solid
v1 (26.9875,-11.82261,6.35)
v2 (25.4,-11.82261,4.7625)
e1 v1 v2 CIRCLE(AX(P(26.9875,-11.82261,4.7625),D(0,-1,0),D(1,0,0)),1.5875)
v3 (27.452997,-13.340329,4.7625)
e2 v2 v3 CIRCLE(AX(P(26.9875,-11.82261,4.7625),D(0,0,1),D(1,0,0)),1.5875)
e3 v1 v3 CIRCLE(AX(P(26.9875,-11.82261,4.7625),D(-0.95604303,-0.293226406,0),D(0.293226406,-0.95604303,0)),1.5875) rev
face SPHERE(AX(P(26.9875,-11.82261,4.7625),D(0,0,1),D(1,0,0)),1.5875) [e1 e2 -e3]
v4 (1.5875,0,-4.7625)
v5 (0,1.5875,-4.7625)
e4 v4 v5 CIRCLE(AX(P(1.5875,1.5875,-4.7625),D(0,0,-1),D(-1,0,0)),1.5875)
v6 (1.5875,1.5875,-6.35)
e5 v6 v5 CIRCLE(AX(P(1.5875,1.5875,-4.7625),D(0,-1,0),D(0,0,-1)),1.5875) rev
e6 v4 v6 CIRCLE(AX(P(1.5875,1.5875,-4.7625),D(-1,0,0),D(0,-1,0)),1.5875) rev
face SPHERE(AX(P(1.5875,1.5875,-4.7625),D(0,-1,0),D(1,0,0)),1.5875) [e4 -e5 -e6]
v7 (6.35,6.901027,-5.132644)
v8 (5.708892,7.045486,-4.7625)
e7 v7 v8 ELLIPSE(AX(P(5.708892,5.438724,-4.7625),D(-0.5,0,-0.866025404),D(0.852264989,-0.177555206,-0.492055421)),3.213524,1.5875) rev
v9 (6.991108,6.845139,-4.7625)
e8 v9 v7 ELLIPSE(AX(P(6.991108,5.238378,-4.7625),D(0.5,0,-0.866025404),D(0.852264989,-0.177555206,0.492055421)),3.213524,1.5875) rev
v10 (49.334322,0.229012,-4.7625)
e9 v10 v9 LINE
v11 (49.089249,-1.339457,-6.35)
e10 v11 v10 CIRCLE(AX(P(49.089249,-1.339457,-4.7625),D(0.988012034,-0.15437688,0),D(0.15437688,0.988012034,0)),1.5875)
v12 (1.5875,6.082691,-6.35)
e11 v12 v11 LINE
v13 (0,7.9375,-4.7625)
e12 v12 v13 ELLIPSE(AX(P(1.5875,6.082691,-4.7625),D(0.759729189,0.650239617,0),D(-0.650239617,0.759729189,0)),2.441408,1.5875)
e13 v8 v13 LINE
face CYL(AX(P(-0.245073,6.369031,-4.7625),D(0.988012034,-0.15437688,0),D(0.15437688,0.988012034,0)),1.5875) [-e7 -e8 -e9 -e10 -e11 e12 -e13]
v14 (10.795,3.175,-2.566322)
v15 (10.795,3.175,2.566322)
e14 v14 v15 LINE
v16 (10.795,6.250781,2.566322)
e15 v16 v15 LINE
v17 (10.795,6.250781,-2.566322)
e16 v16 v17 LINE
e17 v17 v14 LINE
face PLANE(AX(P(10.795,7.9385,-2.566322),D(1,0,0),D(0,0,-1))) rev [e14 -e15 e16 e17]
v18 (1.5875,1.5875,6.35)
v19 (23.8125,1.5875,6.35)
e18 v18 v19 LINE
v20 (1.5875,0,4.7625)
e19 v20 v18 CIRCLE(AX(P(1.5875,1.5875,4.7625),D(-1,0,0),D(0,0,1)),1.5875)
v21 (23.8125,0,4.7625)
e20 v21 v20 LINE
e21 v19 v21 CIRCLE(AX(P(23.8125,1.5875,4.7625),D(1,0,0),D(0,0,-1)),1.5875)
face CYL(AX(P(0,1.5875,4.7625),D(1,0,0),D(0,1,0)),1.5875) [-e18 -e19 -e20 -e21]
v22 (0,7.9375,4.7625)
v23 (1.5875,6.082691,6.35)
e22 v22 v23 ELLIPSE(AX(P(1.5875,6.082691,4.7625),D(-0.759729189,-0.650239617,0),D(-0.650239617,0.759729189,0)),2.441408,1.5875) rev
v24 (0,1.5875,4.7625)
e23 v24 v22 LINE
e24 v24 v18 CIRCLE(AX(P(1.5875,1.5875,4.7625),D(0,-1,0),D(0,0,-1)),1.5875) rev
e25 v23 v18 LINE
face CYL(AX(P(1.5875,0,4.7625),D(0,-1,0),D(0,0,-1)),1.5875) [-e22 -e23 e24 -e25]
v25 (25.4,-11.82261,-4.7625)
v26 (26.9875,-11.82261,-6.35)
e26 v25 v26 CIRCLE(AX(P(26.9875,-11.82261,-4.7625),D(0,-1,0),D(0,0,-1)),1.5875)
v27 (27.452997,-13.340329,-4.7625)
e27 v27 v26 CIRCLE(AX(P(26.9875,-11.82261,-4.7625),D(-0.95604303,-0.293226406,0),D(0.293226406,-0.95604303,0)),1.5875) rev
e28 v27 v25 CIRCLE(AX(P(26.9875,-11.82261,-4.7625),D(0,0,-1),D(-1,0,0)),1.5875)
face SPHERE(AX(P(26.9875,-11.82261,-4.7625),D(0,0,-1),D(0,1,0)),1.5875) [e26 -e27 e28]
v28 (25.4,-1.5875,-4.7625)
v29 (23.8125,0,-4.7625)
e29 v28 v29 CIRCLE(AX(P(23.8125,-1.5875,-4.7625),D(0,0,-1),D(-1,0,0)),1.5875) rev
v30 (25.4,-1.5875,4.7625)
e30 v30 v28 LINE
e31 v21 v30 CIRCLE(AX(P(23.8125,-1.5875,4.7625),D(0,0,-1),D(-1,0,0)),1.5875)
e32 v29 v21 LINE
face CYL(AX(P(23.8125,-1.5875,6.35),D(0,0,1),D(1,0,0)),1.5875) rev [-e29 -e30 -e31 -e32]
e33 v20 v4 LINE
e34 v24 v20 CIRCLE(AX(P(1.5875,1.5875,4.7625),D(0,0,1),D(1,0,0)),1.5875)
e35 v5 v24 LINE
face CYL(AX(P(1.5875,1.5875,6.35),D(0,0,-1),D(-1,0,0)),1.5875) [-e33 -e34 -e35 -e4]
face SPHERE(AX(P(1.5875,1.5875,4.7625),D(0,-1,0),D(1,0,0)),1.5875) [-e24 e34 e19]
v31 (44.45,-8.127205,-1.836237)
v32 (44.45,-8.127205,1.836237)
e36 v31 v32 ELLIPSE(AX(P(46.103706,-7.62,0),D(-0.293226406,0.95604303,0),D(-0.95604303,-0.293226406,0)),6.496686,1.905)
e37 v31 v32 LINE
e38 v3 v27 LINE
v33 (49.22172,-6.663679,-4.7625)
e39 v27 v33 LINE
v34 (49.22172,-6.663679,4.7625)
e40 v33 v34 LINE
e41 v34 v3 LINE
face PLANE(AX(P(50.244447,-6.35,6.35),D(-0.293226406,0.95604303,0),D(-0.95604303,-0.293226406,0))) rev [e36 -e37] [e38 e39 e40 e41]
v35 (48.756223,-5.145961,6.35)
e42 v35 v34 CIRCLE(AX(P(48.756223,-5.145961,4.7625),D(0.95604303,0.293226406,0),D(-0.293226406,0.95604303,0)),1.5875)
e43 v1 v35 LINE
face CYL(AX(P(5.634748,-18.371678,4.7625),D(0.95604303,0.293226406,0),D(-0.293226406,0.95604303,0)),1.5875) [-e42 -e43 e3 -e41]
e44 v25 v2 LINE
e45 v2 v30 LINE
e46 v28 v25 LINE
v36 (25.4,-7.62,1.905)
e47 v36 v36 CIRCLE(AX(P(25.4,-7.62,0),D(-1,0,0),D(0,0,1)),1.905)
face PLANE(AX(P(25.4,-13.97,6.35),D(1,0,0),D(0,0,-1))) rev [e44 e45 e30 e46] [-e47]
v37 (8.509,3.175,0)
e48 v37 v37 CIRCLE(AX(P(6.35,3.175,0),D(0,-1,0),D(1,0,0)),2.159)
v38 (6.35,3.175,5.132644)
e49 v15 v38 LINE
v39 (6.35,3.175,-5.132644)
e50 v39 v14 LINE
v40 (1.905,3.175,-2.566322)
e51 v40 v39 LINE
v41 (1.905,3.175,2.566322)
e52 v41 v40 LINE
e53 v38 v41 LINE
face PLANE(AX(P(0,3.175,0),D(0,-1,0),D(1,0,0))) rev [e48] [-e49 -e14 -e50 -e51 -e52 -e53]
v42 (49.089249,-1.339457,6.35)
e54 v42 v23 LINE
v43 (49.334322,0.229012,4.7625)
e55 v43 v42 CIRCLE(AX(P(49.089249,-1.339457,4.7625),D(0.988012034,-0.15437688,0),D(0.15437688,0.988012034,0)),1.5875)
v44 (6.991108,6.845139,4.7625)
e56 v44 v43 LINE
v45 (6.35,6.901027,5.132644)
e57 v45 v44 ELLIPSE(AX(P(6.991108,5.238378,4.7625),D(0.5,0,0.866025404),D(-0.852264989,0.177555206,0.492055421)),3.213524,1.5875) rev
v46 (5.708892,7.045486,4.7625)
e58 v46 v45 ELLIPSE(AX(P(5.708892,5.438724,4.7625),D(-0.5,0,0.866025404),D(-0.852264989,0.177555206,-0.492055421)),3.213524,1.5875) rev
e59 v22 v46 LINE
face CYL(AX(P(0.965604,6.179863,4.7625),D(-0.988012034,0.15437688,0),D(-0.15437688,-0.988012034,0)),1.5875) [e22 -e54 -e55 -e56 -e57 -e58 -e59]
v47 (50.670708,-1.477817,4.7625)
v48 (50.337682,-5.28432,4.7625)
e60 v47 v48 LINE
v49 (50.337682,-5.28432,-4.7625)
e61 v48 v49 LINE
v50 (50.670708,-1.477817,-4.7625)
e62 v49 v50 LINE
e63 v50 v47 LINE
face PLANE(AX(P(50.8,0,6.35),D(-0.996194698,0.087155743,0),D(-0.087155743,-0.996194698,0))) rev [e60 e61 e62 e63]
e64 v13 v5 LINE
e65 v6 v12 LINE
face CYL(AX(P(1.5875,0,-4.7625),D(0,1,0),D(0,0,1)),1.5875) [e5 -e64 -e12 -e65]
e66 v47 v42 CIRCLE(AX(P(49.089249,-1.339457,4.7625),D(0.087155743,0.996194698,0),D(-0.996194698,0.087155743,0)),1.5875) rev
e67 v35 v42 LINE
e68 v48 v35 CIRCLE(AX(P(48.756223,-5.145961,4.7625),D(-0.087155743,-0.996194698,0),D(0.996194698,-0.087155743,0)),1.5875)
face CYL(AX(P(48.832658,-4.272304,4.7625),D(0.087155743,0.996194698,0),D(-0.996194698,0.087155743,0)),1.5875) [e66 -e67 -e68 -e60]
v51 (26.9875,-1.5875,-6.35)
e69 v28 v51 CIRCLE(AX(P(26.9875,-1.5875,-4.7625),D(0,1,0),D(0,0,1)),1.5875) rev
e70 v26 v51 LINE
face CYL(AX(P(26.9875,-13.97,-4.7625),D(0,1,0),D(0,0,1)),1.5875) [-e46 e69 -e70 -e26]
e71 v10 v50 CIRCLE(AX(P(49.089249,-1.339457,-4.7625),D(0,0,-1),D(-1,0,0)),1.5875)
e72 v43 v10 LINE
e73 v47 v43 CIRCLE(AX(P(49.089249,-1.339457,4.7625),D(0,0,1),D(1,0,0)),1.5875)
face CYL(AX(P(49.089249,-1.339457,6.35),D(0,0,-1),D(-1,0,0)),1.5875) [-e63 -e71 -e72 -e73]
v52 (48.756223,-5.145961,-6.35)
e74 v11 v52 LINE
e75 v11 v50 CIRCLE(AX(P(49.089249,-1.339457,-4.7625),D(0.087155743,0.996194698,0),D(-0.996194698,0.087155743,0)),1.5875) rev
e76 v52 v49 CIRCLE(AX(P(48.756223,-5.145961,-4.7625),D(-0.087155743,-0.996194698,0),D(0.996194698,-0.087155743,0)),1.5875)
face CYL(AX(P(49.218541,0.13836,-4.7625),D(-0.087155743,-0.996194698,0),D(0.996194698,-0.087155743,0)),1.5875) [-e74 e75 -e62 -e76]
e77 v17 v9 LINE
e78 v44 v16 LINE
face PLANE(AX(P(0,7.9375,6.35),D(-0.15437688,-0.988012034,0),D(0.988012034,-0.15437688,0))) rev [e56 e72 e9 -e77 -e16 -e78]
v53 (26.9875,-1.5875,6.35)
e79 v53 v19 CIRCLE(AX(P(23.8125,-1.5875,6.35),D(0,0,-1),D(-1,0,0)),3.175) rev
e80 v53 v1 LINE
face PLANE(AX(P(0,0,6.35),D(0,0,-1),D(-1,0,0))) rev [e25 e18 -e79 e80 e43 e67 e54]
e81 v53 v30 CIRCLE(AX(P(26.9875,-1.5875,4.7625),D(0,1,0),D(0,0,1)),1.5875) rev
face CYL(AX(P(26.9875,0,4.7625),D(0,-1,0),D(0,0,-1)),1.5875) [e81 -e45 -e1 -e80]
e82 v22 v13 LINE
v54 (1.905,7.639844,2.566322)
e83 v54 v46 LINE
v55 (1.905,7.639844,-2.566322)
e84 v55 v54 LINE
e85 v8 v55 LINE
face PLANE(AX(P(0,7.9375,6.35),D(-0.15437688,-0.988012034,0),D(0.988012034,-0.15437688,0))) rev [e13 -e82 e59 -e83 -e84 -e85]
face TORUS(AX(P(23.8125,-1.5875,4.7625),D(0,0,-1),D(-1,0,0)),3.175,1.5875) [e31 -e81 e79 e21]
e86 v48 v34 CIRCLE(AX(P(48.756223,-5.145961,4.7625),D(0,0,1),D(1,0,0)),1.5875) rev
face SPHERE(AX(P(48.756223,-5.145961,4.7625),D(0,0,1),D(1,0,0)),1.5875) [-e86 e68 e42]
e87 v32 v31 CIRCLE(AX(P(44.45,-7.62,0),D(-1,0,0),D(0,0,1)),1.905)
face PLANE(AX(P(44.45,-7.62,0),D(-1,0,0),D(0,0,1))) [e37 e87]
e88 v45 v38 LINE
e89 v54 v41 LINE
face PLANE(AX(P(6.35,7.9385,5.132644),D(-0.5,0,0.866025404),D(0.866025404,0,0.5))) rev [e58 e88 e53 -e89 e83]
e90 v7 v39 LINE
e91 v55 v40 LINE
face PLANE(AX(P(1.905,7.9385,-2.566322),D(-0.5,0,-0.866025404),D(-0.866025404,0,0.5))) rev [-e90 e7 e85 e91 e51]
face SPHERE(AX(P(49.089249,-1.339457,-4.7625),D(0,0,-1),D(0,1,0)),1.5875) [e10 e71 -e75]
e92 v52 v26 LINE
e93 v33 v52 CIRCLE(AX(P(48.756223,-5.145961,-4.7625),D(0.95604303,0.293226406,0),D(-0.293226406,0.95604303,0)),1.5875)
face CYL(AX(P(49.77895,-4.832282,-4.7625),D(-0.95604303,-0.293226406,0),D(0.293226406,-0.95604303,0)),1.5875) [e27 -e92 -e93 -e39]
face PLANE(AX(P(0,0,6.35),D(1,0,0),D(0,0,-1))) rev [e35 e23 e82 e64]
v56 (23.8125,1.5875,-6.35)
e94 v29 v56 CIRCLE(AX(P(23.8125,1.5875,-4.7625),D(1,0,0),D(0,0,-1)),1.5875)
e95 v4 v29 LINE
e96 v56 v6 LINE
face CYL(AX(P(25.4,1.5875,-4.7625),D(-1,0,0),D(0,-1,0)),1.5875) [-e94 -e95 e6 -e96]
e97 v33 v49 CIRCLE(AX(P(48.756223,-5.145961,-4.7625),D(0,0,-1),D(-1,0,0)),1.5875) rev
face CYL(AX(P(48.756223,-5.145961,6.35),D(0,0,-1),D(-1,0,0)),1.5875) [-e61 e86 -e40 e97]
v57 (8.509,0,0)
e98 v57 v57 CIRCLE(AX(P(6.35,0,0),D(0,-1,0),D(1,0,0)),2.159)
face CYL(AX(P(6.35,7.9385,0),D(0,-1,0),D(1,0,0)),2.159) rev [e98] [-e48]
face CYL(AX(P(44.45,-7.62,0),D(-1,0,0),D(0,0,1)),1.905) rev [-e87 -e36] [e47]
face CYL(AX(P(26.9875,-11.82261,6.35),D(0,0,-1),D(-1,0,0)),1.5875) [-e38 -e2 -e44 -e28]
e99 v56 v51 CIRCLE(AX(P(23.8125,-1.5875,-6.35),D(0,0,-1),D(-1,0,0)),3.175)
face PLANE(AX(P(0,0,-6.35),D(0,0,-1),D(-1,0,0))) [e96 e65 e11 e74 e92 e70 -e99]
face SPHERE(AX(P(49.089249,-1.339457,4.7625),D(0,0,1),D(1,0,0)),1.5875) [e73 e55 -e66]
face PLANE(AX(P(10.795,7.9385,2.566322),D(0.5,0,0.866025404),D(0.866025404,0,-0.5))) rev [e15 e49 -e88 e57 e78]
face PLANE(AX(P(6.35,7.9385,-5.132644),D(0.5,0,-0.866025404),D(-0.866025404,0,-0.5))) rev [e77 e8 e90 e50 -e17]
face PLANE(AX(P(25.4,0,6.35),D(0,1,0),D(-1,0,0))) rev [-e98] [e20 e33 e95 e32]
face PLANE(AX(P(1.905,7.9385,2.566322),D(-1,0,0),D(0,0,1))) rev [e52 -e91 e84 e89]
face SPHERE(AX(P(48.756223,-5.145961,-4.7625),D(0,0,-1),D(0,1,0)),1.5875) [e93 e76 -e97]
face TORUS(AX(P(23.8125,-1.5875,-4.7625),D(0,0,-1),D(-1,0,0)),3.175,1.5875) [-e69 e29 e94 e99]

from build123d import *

# Parameters (mm, degrees)
BOSS_EXTRUDE1_DEPTH = 6.35
CUT_EXTRUDE1_REACH  = 55.067
SKETCH2_R           = 2.159
CUT_EXTRUDE2_REACH  = 58.242
CUT_EXTRUDE2_START  = -3.175
SKETCH4_R           = 1.905
CUT_EXTRUDE3_DEPTH  = 19.05
FILLET1_R           = 1.5875


with BuildPart() as part:
    # Sketch1 → Boss-Extrude1 (new, symmetric)
    with BuildSketch(Plane.XY):
        Polygon((0, 0), (0, 7.9375), (25.4, 3.96875), (50.8, 0), (50.244446987, -6.35), (25.4, -13.97), (25.4, 0), align=None)
    extrude(amount=BOSS_EXTRUDE1_DEPTH, both=True)

    # Cut-Extrude1: up to this plane
    cut_extrude1_end = Plane(origin=(0, 7.9375, 6.35), z_dir=(-0.15437688027360963, -0.9880120337511015, 0))
    # Sketch2 → Cut-Extrude1 (cut, up to the surface)
    with BuildSketch(Plane(origin=(0, 0, 0), x_dir=(-1, 0, 0), z_dir=(0, -1, 0)), mode=Mode.PRIVATE) as cut_extrude1_sk1:
        with Locations(Location((-6.35, 0, 0), (0, 0, 180))):
            Circle(SKETCH2_R)
    cut_extrude1_tool1 = split(extrude(cut_extrude1_sk1.sketch, amount=-CUT_EXTRUDE1_REACH, mode=Mode.PRIVATE), bisect_by=cut_extrude1_end, keep=Keep.BOTH, mode=Mode.PRIVATE)
    add(cut_extrude1_tool1.solids().sort_by_distance((6.35, 0, 0))[0], mode=Mode.SUBTRACT)

    # Cut-Extrude2: up to this plane
    cut_extrude2_end = Plane(origin=(0, 7.9375, 6.35), z_dir=(-0.15437688027360963, -0.9880120337511015, 0))
    # Sketch3 → Cut-Extrude2 (cut, up to the surface)
    with BuildSketch(Plane.XZ.offset(CUT_EXTRUDE2_START), mode=Mode.PRIVATE) as cut_extrude2_sk1:
        Polygon((6.35, 5.132643893), (1.905, 2.566321947), (1.905, -2.566321947), (6.35, -5.132643893), (10.795, -2.566321947), (10.795, 2.566321947), align=None)
    cut_extrude2_tool1 = split(extrude(cut_extrude2_sk1.sketch, amount=-CUT_EXTRUDE2_REACH, mode=Mode.PRIVATE), bisect_by=cut_extrude2_end, keep=Keep.BOTH, mode=Mode.PRIVATE)
    add(cut_extrude2_tool1.solids().sort_by_distance((6.35, 3.175, 0))[0], mode=Mode.SUBTRACT)

    # Sketch4 → Cut-Extrude3 (cut)
    with BuildSketch(Plane.ZY.offset(-25.4)):
        with Locations((0, -7.62)):
            Circle(SKETCH4_R)
    extrude(amount=-CUT_EXTRUDE3_DEPTH, mode=Mode.SUBTRACT)

    # Fillet1
    # the kernel refuses this fillet: 1.5875 mm, written as the material it adds along each edge
    with BuildSketch(Plane(origin=(25.4, 0, -6.35), x_dir=(-1, 0, 0), z_dir=(0, 0, 1))) as fillet1_piece_1:
        with BuildLine():
            CenterArc((FILLET1_R, FILLET1_R), FILLET1_R, 180, 90)
            Line((0, FILLET1_R), (0, 0))
            Line((0, 0), (FILLET1_R, 0))
        make_face()
    extrude(amount=12.7)
    # the kernel refuses this fillet: 1.5875 mm, written as the material it takes off along each edge
    with BuildSketch(Plane(origin=(1.5875, 1.5875, -4.7625), x_dir=(0, -1, 0), z_dir=(-1, 0, 0))) as fillet1_2_piece_1_section:
        Polygon((0, 0), (FILLET1_R, 0), (FILLET1_R, -FILLET1_R), (0, -FILLET1_R), align=None)
    fillet1_2_piece_1 = extrude(amount=FILLET1_R, mode=Mode.PRIVATE)
    fillet1_2_piece_1 = fillet1_2_piece_1 - Plane(origin=(1.5875, 1.5875, -4.7625), x_dir=(0, 0.7071067811865475, 0.7071067811865475), z_dir=(-1, 0, 0)) * Sphere(FILLET1_R, mode=Mode.PRIVATE)
    add(fillet1_2_piece_1, mode=Mode.SUBTRACT)
    with BuildSketch(Plane(origin=(1.5875, 1.5875, 4.7625), x_dir=(0, -1, 0), z_dir=(-1, 0, 0))) as fillet1_2_piece_2_section:
        Polygon((0, 0), (FILLET1_R, 0), (FILLET1_R, FILLET1_R), (0, FILLET1_R), align=None)
    fillet1_2_piece_2 = extrude(amount=FILLET1_R, mode=Mode.PRIVATE)
    fillet1_2_piece_2 = fillet1_2_piece_2 - Plane(origin=(1.5875, 1.5875, 4.7625), x_dir=(0, 0.7071067811865475, -0.7071067811865475), z_dir=(-1, 0, 0)) * Sphere(FILLET1_R, mode=Mode.PRIVATE)
    add(fillet1_2_piece_2, mode=Mode.SUBTRACT)
    with BuildSketch(Plane(origin=(48.756222782, -5.145960715, 4.7625), x_dir=(0.9961946980917461, -0.08715574274765191, 0), z_dir=(0, 0, 1))) as fillet1_2_piece_3_section:
        Polygon((0, 0), (FILLET1_R, 0), (FILLET1_R, -FILLET1_R * 0.67385843517), (FILLET1_R * 0.375435230935, -FILLET1_R * 0.926848632395), align=None)
    fillet1_2_piece_3 = extrude(amount=FILLET1_R, mode=Mode.PRIVATE)
    fillet1_2_piece_3 = fillet1_2_piece_3 - Plane(origin=(48.756222782, -5.145960715, 4.7625), x_dir=(-0.7774271509889946, 0.6289729921905509, 0), z_dir=(0, 0, 1)) * Sphere(FILLET1_R, mode=Mode.PRIVATE)
    add(fillet1_2_piece_3, mode=Mode.SUBTRACT)
    with BuildSketch(Plane(origin=(26.9875, -11.822610338, 4.7625), x_dir=(0.2932264055627704, -0.9560430299315705, 0), z_dir=(0, 0, 1))) as fillet1_2_piece_4_section:
        Polygon((0, 0), (FILLET1_R, 0), (FILLET1_R, -FILLET1_R * 1.35268640121), (-FILLET1_R * 0.293226405563, -FILLET1_R * 0.956043029932), align=None)
    fillet1_2_piece_4 = extrude(amount=FILLET1_R, mode=Mode.PRIVATE)
    fillet1_2_piece_4 = fillet1_2_piece_4 - Plane(origin=(26.9875, -11.822610338, 4.7625), x_dir=(0.5944634532236736, 0.8041226291936978, 0), z_dir=(0, 0, 1)) * Sphere(FILLET1_R, mode=Mode.PRIVATE)
    add(fillet1_2_piece_4, mode=Mode.SUBTRACT)
    with BuildSketch(Plane(origin=(49.089248712, -1.339456918, 4.7625), x_dir=(0.9961946980917461, -0.08715574274765191, 0), z_dir=(0, 0, 1))) as fillet1_2_piece_5_section:
        Polygon((0, 0), (FILLET1_R, 0), (FILLET1_R, FILLET1_R * 0.934464049622), (FILLET1_R * 0.0676785069913, FILLET1_R * 0.997707181337), align=None)
    fillet1_2_piece_5 = extrude(amount=FILLET1_R, mode=Mode.PRIVATE)
    fillet1_2_piece_5 = fillet1_2_piece_5 - Plane(origin=(49.089248712, -1.339456918, 4.7625), x_dir=(-0.7873691485833406, -0.6164818114584931, 0), z_dir=(0, 0, 1)) * Sphere(FILLET1_R, mode=Mode.PRIVATE)
    add(fillet1_2_piece_5, mode=Mode.SUBTRACT)
    with BuildSketch(Plane(origin=(49.089248712, -1.339456918, -4.7625), x_dir=(0.15437688027360963, 0.9880120337511015, 0), z_dir=(0, 0, -1))) as fillet1_2_piece_6_section:
        Polygon((0, 0), (FILLET1_R, 0), (FILLET1_R, FILLET1_R * 0.934464049622), (FILLET1_R * 0.0676785069913, FILLET1_R * 0.997707181337), align=None)
    fillet1_2_piece_6 = extrude(amount=FILLET1_R, mode=Mode.PRIVATE)
    fillet1_2_piece_6 = fillet1_2_piece_6 - Plane(origin=(49.089248712, -1.339456918, -4.7625), x_dir=(-0.7873691485833406, -0.6164818114584931, 0), z_dir=(0, 0, -1)) * Sphere(FILLET1_R, mode=Mode.PRIVATE)
    add(fillet1_2_piece_6, mode=Mode.SUBTRACT)
    with BuildSketch(Plane(origin=(48.756222782, -5.145960715, -4.7625), x_dir=(0.9961946980917461, -0.08715574274765191, 0), z_dir=(0, 0, -1))) as fillet1_2_piece_7_section:
        Polygon((0, 0), (FILLET1_R, 0), (FILLET1_R, FILLET1_R * 0.67385843517), (FILLET1_R * 0.375435230935, FILLET1_R * 0.926848632395), align=None)
    fillet1_2_piece_7 = extrude(amount=FILLET1_R, mode=Mode.PRIVATE)
    fillet1_2_piece_7 = fillet1_2_piece_7 - Plane(origin=(48.756222782, -5.145960715, -4.7625), x_dir=(-0.7774271509889946, 0.6289729921905509, 0), z_dir=(0, 0, -1)) * Sphere(FILLET1_R, mode=Mode.PRIVATE)
    add(fillet1_2_piece_7, mode=Mode.SUBTRACT)
    with BuildSketch(Plane(origin=(26.9875, -11.822610338, -4.7625), x_dir=(0.2932264055627704, -0.9560430299315705, 0), z_dir=(0, 0, -1))) as fillet1_2_piece_8_section:
        Polygon((0, 0), (FILLET1_R, 0), (FILLET1_R, FILLET1_R * 1.35268640121), (-FILLET1_R * 0.293226405563, FILLET1_R * 0.956043029932), align=None)
    fillet1_2_piece_8 = extrude(amount=FILLET1_R, mode=Mode.PRIVATE)
    fillet1_2_piece_8 = fillet1_2_piece_8 - Plane(origin=(26.9875, -11.822610338, -4.7625), x_dir=(0.5944634532236736, 0.8041226291936978, 0), z_dir=(0, 0, -1)) * Sphere(FILLET1_R, mode=Mode.PRIVATE)
    add(fillet1_2_piece_8, mode=Mode.SUBTRACT)
    with BuildSketch(Plane(origin=(23.8125, 0, -6.35), x_dir=(0, 0, 1), z_dir=(-1, 0, 0))) as fillet1_2_piece_9:
        with BuildLine():
            CenterArc((FILLET1_R, FILLET1_R), FILLET1_R, 180, 90)
            Line((0, FILLET1_R), (0, 0))
            Line((0, 0), (FILLET1_R, 0))
        make_face()
    extrude(amount=22.225, mode=Mode.SUBTRACT)
    with BuildSketch(Plane(origin=(0, 0, -4.7625), x_dir=(0, 1, 0), z_dir=(0, 0, 1))) as fillet1_2_piece_10:
        with BuildLine():
            CenterArc((FILLET1_R, -FILLET1_R), FILLET1_R, 90, 90)
            Line((0, -FILLET1_R), (0, 0))
            Line((0, 0), (FILLET1_R, 0))
        make_face()
    extrude(amount=9.525, mode=Mode.SUBTRACT)
    with BuildSketch(Plane(origin=(49.221719701, -6.663679025, 6.35), x_dir=(-0.2932264055627704, 0.9560430299315705, 0), z_dir=(-0.9560430299315705, -0.2932264055627704, 0))) as fillet1_2_piece_11:
        with BuildLine():
            CenterArc((FILLET1_R, FILLET1_R), FILLET1_R, 180, 90)
            Line((0, FILLET1_R), (0, 0))
            Line((0, 0), (FILLET1_R, 0))
        make_face()
    extrude(amount=22.769605657, mode=Mode.SUBTRACT)
    with BuildSketch(Plane(origin=(50.8, 0, 4.7625), x_dir=(-0.9880120337511016, 0.15437688027360932, 0), z_dir=(0, 0, -1))) as fillet1_2_piece_12:
        with BuildLine():
            CenterArc((FILLET1_R * 0.934464049622, -FILLET1_R), FILLET1_R, 90, 86.119340849)
            Line((-FILLET1_R * 0.0632431317154, -FILLET1_R * 0.932321493009), (0, 0))
            Line((0, 0), (FILLET1_R * 0.934464049622, 0))
        make_face()
    extrude(amount=9.525, mode=Mode.SUBTRACT)
    with BuildSketch(Plane(origin=(50.244446987, -6.35, 4.7625), x_dir=(0.08715574274764938, 0.9961946980917463, 0), z_dir=(0, 0, -1))) as fillet1_2_piece_13:
        with BuildLine():
            CenterArc((FILLET1_R * 0.67385843517, -FILLET1_R), FILLET1_R, 90, 67.948784684)
            Line((-FILLET1_R * 0.252990197225, -FILLET1_R * 0.624564769065), (0, 0))
            Line((0, 0), (FILLET1_R * 0.67385843517, 0))
        make_face()
    extrude(amount=9.525, mode=Mode.SUBTRACT)
    with BuildSketch(Plane(origin=(25.4, -13.97, -4.7625), x_dir=(0.9560430299315704, 0.2932264055627704, 0), z_dir=(0, 0, 1))) as fillet1_2_piece_14:
        with BuildLine():
            CenterArc((FILLET1_R * 1.35268640121, FILLET1_R), FILLET1_R, 162.948784684, 107.051215316)
            Line((FILLET1_R * 0.396643371281, FILLET1_R * 1.29322640556), (0, 0))
            Line((0, 0), (FILLET1_R * 1.35268640121, 0))
        make_face()
    extrude(amount=9.525, mode=Mode.SUBTRACT)
    with BuildSketch(Plane(origin=(50.670707796, -1.477816659, 6.35), x_dir=(-0.9961946980917462, 0.08715574274765192, 0), z_dir=(-0.08715574274765191, -0.9961946980917461, 0))) as fillet1_2_piece_15:
        with BuildLine():
            CenterArc((FILLET1_R, FILLET1_R), FILLET1_R, 180, 90)
            Line((0, FILLET1_R), (0, 0))
            Line((0, 0), (FILLET1_R, 0))
        make_face()
    extrude(amount=3.821044024, mode=Mode.SUBTRACT)
    with BuildSketch(Plane(origin=(-3.921172759, 8.550183244, 6.35), x_dir=(0, 0, -1), z_dir=(0.9880120337511015, -0.1543768802736096, 0))) as fillet1_2_piece_16:
        with BuildLine():
            CenterArc((FILLET1_R, -FILLET1_R), FILLET1_R, 90, 90)
            Line((0, -FILLET1_R), (0, 0))
            Line((0, 0), (FILLET1_R, 0))
        make_face()
    extrude(amount=53.901666123, mode=Mode.SUBTRACT)
    with BuildSketch(Plane(origin=(0, 1.5875, 6.35), x_dir=(0, 0, -1), z_dir=(0, 1, 0))) as fillet1_2_piece_17:
        with BuildLine():
            CenterArc((FILLET1_R, -FILLET1_R), FILLET1_R, 90, 90)
            Line((0, -FILLET1_R), (0, 0))
            Line((0, 0), (FILLET1_R, 0))
        make_face()
    extrude(amount=10.31875, mode=Mode.SUBTRACT)
    with BuildSketch(Plane(origin=(23.8125, 0, 6.35), x_dir=(0, 0, -1), z_dir=(-1, 0, 0))) as fillet1_2_piece_18:
        with BuildLine():
            CenterArc((FILLET1_R, -FILLET1_R), FILLET1_R, 90, 90)
            Line((0, -FILLET1_R), (0, 0))
            Line((0, 0), (FILLET1_R, 0))
        make_face()
    extrude(amount=22.225, mode=Mode.SUBTRACT)
    with BuildSketch(Plane(origin=(0, 1.5875, -6.35), x_dir=(0, 0, 1), z_dir=(0, 1, 0))) as fillet1_2_piece_19:
        with BuildLine():
            CenterArc((FILLET1_R, FILLET1_R), FILLET1_R, 180, 90)
            Line((0, FILLET1_R), (0, 0))
            Line((0, 0), (FILLET1_R, 0))
        make_face()
    extrude(amount=10.31875, mode=Mode.SUBTRACT)
    with BuildSketch(Plane(origin=(49.33432201, 0.229012186, -6.35), x_dir=(-0.1543768802736096, -0.9880120337511015, 0), z_dir=(-0.9880120337511015, 0.1543768802736096, 0))) as fillet1_2_piece_20:
        with BuildLine():
            CenterArc((FILLET1_R, FILLET1_R), FILLET1_R, 180, 90)
            Line((0, FILLET1_R), (0, 0))
            Line((0, 0), (FILLET1_R, 0))
        make_face()
    extrude(amount=53.901666123, mode=Mode.SUBTRACT)
    with BuildSketch(Plane(origin=(50.670707796, -1.477816659, -6.35), x_dir=(-0.9961946980917462, 0.08715574274765192, 0), z_dir=(-0.08715574274765191, -0.9961946980917461, 0))) as fillet1_2_piece_21:
        with BuildLine():
            CenterArc((FILLET1_R, -FILLET1_R), FILLET1_R, 90, 90)
            Line((0, -FILLET1_R), (0, 0))
            Line((0, 0), (FILLET1_R, 0))
        make_face()
    extrude(amount=3.821044024, mode=Mode.SUBTRACT)
    with BuildSketch(Plane(origin=(25.4, -11.822610338, 6.35), x_dir=(1, 0, 0), z_dir=(0, 1, 0))) as fillet1_2_piece_22:
        with BuildLine():
            CenterArc((FILLET1_R, FILLET1_R), FILLET1_R, 180, 90)
            Line((0, FILLET1_R), (0, 0))
            Line((0, 0), (FILLET1_R, 0))
        make_face()
    extrude(amount=10.235110338, mode=Mode.SUBTRACT)
    with BuildSketch(Plane(origin=(49.221719701, -6.663679025, -6.35), x_dir=(-0.2932264055627704, 0.9560430299315705, 0), z_dir=(-0.9560430299315705, -0.2932264055627704, 0))) as fillet1_2_piece_23:
        with BuildLine():
            CenterArc((FILLET1_R, -FILLET1_R), FILLET1_R, 90, 90)
            Line((0, -FILLET1_R), (0, 0))
            Line((0, 0), (FILLET1_R, 0))
        make_face()
    extrude(amount=22.769605657, mode=Mode.SUBTRACT)
    with BuildSketch(Plane(origin=(25.4, -11.822610338, -6.35), x_dir=(1, 0, 0), z_dir=(0, 1, 0))) as fillet1_2_piece_24:
        with BuildLine():
            CenterArc((FILLET1_R, -FILLET1_R), FILLET1_R, 90, 90)
            Line((0, -FILLET1_R), (0, 0))
            Line((0, 0), (FILLET1_R, 0))
        make_face()
    extrude(amount=10.235110338, mode=Mode.SUBTRACT)
    with BuildSketch(Plane(origin=(23.8125, -1.5875, -6.35), x_dir=(0, 1, 0), z_dir=(-1, 0, 0))) as fillet1_2_piece_25:
        with BuildLine():
            CenterArc((1.5875 + FILLET1_R, -FILLET1_R), FILLET1_R, 90, 90)
            Line((1.5875, -FILLET1_R), (1.5875, 0))
            Line((1.5875, 0), (1.5875 + FILLET1_R, 0))
        make_face()
    revolve(axis=Axis((23.8125, -1.5875, -6.35), (0, 0, -1)), revolution_arc=90, mode=Mode.SUBTRACT)
    with BuildSketch(Plane(origin=(23.8125, -1.5875, 6.35), x_dir=(0, 1, 0), z_dir=(-1, 0, 0))) as fillet1_2_piece_26:
        with BuildLine():
            CenterArc((1.5875 + FILLET1_R, FILLET1_R), FILLET1_R, 180, 90)
            Line((1.5875, FILLET1_R), (1.5875, 0))
            Line((1.5875, 0), (1.5875 + FILLET1_R, 0))
        make_face()
    revolve(axis=Axis((23.8125, -1.5875, 6.35), (0, 0, -1)), revolution_arc=90, mode=Mode.SUBTRACT)


solid = part.part
